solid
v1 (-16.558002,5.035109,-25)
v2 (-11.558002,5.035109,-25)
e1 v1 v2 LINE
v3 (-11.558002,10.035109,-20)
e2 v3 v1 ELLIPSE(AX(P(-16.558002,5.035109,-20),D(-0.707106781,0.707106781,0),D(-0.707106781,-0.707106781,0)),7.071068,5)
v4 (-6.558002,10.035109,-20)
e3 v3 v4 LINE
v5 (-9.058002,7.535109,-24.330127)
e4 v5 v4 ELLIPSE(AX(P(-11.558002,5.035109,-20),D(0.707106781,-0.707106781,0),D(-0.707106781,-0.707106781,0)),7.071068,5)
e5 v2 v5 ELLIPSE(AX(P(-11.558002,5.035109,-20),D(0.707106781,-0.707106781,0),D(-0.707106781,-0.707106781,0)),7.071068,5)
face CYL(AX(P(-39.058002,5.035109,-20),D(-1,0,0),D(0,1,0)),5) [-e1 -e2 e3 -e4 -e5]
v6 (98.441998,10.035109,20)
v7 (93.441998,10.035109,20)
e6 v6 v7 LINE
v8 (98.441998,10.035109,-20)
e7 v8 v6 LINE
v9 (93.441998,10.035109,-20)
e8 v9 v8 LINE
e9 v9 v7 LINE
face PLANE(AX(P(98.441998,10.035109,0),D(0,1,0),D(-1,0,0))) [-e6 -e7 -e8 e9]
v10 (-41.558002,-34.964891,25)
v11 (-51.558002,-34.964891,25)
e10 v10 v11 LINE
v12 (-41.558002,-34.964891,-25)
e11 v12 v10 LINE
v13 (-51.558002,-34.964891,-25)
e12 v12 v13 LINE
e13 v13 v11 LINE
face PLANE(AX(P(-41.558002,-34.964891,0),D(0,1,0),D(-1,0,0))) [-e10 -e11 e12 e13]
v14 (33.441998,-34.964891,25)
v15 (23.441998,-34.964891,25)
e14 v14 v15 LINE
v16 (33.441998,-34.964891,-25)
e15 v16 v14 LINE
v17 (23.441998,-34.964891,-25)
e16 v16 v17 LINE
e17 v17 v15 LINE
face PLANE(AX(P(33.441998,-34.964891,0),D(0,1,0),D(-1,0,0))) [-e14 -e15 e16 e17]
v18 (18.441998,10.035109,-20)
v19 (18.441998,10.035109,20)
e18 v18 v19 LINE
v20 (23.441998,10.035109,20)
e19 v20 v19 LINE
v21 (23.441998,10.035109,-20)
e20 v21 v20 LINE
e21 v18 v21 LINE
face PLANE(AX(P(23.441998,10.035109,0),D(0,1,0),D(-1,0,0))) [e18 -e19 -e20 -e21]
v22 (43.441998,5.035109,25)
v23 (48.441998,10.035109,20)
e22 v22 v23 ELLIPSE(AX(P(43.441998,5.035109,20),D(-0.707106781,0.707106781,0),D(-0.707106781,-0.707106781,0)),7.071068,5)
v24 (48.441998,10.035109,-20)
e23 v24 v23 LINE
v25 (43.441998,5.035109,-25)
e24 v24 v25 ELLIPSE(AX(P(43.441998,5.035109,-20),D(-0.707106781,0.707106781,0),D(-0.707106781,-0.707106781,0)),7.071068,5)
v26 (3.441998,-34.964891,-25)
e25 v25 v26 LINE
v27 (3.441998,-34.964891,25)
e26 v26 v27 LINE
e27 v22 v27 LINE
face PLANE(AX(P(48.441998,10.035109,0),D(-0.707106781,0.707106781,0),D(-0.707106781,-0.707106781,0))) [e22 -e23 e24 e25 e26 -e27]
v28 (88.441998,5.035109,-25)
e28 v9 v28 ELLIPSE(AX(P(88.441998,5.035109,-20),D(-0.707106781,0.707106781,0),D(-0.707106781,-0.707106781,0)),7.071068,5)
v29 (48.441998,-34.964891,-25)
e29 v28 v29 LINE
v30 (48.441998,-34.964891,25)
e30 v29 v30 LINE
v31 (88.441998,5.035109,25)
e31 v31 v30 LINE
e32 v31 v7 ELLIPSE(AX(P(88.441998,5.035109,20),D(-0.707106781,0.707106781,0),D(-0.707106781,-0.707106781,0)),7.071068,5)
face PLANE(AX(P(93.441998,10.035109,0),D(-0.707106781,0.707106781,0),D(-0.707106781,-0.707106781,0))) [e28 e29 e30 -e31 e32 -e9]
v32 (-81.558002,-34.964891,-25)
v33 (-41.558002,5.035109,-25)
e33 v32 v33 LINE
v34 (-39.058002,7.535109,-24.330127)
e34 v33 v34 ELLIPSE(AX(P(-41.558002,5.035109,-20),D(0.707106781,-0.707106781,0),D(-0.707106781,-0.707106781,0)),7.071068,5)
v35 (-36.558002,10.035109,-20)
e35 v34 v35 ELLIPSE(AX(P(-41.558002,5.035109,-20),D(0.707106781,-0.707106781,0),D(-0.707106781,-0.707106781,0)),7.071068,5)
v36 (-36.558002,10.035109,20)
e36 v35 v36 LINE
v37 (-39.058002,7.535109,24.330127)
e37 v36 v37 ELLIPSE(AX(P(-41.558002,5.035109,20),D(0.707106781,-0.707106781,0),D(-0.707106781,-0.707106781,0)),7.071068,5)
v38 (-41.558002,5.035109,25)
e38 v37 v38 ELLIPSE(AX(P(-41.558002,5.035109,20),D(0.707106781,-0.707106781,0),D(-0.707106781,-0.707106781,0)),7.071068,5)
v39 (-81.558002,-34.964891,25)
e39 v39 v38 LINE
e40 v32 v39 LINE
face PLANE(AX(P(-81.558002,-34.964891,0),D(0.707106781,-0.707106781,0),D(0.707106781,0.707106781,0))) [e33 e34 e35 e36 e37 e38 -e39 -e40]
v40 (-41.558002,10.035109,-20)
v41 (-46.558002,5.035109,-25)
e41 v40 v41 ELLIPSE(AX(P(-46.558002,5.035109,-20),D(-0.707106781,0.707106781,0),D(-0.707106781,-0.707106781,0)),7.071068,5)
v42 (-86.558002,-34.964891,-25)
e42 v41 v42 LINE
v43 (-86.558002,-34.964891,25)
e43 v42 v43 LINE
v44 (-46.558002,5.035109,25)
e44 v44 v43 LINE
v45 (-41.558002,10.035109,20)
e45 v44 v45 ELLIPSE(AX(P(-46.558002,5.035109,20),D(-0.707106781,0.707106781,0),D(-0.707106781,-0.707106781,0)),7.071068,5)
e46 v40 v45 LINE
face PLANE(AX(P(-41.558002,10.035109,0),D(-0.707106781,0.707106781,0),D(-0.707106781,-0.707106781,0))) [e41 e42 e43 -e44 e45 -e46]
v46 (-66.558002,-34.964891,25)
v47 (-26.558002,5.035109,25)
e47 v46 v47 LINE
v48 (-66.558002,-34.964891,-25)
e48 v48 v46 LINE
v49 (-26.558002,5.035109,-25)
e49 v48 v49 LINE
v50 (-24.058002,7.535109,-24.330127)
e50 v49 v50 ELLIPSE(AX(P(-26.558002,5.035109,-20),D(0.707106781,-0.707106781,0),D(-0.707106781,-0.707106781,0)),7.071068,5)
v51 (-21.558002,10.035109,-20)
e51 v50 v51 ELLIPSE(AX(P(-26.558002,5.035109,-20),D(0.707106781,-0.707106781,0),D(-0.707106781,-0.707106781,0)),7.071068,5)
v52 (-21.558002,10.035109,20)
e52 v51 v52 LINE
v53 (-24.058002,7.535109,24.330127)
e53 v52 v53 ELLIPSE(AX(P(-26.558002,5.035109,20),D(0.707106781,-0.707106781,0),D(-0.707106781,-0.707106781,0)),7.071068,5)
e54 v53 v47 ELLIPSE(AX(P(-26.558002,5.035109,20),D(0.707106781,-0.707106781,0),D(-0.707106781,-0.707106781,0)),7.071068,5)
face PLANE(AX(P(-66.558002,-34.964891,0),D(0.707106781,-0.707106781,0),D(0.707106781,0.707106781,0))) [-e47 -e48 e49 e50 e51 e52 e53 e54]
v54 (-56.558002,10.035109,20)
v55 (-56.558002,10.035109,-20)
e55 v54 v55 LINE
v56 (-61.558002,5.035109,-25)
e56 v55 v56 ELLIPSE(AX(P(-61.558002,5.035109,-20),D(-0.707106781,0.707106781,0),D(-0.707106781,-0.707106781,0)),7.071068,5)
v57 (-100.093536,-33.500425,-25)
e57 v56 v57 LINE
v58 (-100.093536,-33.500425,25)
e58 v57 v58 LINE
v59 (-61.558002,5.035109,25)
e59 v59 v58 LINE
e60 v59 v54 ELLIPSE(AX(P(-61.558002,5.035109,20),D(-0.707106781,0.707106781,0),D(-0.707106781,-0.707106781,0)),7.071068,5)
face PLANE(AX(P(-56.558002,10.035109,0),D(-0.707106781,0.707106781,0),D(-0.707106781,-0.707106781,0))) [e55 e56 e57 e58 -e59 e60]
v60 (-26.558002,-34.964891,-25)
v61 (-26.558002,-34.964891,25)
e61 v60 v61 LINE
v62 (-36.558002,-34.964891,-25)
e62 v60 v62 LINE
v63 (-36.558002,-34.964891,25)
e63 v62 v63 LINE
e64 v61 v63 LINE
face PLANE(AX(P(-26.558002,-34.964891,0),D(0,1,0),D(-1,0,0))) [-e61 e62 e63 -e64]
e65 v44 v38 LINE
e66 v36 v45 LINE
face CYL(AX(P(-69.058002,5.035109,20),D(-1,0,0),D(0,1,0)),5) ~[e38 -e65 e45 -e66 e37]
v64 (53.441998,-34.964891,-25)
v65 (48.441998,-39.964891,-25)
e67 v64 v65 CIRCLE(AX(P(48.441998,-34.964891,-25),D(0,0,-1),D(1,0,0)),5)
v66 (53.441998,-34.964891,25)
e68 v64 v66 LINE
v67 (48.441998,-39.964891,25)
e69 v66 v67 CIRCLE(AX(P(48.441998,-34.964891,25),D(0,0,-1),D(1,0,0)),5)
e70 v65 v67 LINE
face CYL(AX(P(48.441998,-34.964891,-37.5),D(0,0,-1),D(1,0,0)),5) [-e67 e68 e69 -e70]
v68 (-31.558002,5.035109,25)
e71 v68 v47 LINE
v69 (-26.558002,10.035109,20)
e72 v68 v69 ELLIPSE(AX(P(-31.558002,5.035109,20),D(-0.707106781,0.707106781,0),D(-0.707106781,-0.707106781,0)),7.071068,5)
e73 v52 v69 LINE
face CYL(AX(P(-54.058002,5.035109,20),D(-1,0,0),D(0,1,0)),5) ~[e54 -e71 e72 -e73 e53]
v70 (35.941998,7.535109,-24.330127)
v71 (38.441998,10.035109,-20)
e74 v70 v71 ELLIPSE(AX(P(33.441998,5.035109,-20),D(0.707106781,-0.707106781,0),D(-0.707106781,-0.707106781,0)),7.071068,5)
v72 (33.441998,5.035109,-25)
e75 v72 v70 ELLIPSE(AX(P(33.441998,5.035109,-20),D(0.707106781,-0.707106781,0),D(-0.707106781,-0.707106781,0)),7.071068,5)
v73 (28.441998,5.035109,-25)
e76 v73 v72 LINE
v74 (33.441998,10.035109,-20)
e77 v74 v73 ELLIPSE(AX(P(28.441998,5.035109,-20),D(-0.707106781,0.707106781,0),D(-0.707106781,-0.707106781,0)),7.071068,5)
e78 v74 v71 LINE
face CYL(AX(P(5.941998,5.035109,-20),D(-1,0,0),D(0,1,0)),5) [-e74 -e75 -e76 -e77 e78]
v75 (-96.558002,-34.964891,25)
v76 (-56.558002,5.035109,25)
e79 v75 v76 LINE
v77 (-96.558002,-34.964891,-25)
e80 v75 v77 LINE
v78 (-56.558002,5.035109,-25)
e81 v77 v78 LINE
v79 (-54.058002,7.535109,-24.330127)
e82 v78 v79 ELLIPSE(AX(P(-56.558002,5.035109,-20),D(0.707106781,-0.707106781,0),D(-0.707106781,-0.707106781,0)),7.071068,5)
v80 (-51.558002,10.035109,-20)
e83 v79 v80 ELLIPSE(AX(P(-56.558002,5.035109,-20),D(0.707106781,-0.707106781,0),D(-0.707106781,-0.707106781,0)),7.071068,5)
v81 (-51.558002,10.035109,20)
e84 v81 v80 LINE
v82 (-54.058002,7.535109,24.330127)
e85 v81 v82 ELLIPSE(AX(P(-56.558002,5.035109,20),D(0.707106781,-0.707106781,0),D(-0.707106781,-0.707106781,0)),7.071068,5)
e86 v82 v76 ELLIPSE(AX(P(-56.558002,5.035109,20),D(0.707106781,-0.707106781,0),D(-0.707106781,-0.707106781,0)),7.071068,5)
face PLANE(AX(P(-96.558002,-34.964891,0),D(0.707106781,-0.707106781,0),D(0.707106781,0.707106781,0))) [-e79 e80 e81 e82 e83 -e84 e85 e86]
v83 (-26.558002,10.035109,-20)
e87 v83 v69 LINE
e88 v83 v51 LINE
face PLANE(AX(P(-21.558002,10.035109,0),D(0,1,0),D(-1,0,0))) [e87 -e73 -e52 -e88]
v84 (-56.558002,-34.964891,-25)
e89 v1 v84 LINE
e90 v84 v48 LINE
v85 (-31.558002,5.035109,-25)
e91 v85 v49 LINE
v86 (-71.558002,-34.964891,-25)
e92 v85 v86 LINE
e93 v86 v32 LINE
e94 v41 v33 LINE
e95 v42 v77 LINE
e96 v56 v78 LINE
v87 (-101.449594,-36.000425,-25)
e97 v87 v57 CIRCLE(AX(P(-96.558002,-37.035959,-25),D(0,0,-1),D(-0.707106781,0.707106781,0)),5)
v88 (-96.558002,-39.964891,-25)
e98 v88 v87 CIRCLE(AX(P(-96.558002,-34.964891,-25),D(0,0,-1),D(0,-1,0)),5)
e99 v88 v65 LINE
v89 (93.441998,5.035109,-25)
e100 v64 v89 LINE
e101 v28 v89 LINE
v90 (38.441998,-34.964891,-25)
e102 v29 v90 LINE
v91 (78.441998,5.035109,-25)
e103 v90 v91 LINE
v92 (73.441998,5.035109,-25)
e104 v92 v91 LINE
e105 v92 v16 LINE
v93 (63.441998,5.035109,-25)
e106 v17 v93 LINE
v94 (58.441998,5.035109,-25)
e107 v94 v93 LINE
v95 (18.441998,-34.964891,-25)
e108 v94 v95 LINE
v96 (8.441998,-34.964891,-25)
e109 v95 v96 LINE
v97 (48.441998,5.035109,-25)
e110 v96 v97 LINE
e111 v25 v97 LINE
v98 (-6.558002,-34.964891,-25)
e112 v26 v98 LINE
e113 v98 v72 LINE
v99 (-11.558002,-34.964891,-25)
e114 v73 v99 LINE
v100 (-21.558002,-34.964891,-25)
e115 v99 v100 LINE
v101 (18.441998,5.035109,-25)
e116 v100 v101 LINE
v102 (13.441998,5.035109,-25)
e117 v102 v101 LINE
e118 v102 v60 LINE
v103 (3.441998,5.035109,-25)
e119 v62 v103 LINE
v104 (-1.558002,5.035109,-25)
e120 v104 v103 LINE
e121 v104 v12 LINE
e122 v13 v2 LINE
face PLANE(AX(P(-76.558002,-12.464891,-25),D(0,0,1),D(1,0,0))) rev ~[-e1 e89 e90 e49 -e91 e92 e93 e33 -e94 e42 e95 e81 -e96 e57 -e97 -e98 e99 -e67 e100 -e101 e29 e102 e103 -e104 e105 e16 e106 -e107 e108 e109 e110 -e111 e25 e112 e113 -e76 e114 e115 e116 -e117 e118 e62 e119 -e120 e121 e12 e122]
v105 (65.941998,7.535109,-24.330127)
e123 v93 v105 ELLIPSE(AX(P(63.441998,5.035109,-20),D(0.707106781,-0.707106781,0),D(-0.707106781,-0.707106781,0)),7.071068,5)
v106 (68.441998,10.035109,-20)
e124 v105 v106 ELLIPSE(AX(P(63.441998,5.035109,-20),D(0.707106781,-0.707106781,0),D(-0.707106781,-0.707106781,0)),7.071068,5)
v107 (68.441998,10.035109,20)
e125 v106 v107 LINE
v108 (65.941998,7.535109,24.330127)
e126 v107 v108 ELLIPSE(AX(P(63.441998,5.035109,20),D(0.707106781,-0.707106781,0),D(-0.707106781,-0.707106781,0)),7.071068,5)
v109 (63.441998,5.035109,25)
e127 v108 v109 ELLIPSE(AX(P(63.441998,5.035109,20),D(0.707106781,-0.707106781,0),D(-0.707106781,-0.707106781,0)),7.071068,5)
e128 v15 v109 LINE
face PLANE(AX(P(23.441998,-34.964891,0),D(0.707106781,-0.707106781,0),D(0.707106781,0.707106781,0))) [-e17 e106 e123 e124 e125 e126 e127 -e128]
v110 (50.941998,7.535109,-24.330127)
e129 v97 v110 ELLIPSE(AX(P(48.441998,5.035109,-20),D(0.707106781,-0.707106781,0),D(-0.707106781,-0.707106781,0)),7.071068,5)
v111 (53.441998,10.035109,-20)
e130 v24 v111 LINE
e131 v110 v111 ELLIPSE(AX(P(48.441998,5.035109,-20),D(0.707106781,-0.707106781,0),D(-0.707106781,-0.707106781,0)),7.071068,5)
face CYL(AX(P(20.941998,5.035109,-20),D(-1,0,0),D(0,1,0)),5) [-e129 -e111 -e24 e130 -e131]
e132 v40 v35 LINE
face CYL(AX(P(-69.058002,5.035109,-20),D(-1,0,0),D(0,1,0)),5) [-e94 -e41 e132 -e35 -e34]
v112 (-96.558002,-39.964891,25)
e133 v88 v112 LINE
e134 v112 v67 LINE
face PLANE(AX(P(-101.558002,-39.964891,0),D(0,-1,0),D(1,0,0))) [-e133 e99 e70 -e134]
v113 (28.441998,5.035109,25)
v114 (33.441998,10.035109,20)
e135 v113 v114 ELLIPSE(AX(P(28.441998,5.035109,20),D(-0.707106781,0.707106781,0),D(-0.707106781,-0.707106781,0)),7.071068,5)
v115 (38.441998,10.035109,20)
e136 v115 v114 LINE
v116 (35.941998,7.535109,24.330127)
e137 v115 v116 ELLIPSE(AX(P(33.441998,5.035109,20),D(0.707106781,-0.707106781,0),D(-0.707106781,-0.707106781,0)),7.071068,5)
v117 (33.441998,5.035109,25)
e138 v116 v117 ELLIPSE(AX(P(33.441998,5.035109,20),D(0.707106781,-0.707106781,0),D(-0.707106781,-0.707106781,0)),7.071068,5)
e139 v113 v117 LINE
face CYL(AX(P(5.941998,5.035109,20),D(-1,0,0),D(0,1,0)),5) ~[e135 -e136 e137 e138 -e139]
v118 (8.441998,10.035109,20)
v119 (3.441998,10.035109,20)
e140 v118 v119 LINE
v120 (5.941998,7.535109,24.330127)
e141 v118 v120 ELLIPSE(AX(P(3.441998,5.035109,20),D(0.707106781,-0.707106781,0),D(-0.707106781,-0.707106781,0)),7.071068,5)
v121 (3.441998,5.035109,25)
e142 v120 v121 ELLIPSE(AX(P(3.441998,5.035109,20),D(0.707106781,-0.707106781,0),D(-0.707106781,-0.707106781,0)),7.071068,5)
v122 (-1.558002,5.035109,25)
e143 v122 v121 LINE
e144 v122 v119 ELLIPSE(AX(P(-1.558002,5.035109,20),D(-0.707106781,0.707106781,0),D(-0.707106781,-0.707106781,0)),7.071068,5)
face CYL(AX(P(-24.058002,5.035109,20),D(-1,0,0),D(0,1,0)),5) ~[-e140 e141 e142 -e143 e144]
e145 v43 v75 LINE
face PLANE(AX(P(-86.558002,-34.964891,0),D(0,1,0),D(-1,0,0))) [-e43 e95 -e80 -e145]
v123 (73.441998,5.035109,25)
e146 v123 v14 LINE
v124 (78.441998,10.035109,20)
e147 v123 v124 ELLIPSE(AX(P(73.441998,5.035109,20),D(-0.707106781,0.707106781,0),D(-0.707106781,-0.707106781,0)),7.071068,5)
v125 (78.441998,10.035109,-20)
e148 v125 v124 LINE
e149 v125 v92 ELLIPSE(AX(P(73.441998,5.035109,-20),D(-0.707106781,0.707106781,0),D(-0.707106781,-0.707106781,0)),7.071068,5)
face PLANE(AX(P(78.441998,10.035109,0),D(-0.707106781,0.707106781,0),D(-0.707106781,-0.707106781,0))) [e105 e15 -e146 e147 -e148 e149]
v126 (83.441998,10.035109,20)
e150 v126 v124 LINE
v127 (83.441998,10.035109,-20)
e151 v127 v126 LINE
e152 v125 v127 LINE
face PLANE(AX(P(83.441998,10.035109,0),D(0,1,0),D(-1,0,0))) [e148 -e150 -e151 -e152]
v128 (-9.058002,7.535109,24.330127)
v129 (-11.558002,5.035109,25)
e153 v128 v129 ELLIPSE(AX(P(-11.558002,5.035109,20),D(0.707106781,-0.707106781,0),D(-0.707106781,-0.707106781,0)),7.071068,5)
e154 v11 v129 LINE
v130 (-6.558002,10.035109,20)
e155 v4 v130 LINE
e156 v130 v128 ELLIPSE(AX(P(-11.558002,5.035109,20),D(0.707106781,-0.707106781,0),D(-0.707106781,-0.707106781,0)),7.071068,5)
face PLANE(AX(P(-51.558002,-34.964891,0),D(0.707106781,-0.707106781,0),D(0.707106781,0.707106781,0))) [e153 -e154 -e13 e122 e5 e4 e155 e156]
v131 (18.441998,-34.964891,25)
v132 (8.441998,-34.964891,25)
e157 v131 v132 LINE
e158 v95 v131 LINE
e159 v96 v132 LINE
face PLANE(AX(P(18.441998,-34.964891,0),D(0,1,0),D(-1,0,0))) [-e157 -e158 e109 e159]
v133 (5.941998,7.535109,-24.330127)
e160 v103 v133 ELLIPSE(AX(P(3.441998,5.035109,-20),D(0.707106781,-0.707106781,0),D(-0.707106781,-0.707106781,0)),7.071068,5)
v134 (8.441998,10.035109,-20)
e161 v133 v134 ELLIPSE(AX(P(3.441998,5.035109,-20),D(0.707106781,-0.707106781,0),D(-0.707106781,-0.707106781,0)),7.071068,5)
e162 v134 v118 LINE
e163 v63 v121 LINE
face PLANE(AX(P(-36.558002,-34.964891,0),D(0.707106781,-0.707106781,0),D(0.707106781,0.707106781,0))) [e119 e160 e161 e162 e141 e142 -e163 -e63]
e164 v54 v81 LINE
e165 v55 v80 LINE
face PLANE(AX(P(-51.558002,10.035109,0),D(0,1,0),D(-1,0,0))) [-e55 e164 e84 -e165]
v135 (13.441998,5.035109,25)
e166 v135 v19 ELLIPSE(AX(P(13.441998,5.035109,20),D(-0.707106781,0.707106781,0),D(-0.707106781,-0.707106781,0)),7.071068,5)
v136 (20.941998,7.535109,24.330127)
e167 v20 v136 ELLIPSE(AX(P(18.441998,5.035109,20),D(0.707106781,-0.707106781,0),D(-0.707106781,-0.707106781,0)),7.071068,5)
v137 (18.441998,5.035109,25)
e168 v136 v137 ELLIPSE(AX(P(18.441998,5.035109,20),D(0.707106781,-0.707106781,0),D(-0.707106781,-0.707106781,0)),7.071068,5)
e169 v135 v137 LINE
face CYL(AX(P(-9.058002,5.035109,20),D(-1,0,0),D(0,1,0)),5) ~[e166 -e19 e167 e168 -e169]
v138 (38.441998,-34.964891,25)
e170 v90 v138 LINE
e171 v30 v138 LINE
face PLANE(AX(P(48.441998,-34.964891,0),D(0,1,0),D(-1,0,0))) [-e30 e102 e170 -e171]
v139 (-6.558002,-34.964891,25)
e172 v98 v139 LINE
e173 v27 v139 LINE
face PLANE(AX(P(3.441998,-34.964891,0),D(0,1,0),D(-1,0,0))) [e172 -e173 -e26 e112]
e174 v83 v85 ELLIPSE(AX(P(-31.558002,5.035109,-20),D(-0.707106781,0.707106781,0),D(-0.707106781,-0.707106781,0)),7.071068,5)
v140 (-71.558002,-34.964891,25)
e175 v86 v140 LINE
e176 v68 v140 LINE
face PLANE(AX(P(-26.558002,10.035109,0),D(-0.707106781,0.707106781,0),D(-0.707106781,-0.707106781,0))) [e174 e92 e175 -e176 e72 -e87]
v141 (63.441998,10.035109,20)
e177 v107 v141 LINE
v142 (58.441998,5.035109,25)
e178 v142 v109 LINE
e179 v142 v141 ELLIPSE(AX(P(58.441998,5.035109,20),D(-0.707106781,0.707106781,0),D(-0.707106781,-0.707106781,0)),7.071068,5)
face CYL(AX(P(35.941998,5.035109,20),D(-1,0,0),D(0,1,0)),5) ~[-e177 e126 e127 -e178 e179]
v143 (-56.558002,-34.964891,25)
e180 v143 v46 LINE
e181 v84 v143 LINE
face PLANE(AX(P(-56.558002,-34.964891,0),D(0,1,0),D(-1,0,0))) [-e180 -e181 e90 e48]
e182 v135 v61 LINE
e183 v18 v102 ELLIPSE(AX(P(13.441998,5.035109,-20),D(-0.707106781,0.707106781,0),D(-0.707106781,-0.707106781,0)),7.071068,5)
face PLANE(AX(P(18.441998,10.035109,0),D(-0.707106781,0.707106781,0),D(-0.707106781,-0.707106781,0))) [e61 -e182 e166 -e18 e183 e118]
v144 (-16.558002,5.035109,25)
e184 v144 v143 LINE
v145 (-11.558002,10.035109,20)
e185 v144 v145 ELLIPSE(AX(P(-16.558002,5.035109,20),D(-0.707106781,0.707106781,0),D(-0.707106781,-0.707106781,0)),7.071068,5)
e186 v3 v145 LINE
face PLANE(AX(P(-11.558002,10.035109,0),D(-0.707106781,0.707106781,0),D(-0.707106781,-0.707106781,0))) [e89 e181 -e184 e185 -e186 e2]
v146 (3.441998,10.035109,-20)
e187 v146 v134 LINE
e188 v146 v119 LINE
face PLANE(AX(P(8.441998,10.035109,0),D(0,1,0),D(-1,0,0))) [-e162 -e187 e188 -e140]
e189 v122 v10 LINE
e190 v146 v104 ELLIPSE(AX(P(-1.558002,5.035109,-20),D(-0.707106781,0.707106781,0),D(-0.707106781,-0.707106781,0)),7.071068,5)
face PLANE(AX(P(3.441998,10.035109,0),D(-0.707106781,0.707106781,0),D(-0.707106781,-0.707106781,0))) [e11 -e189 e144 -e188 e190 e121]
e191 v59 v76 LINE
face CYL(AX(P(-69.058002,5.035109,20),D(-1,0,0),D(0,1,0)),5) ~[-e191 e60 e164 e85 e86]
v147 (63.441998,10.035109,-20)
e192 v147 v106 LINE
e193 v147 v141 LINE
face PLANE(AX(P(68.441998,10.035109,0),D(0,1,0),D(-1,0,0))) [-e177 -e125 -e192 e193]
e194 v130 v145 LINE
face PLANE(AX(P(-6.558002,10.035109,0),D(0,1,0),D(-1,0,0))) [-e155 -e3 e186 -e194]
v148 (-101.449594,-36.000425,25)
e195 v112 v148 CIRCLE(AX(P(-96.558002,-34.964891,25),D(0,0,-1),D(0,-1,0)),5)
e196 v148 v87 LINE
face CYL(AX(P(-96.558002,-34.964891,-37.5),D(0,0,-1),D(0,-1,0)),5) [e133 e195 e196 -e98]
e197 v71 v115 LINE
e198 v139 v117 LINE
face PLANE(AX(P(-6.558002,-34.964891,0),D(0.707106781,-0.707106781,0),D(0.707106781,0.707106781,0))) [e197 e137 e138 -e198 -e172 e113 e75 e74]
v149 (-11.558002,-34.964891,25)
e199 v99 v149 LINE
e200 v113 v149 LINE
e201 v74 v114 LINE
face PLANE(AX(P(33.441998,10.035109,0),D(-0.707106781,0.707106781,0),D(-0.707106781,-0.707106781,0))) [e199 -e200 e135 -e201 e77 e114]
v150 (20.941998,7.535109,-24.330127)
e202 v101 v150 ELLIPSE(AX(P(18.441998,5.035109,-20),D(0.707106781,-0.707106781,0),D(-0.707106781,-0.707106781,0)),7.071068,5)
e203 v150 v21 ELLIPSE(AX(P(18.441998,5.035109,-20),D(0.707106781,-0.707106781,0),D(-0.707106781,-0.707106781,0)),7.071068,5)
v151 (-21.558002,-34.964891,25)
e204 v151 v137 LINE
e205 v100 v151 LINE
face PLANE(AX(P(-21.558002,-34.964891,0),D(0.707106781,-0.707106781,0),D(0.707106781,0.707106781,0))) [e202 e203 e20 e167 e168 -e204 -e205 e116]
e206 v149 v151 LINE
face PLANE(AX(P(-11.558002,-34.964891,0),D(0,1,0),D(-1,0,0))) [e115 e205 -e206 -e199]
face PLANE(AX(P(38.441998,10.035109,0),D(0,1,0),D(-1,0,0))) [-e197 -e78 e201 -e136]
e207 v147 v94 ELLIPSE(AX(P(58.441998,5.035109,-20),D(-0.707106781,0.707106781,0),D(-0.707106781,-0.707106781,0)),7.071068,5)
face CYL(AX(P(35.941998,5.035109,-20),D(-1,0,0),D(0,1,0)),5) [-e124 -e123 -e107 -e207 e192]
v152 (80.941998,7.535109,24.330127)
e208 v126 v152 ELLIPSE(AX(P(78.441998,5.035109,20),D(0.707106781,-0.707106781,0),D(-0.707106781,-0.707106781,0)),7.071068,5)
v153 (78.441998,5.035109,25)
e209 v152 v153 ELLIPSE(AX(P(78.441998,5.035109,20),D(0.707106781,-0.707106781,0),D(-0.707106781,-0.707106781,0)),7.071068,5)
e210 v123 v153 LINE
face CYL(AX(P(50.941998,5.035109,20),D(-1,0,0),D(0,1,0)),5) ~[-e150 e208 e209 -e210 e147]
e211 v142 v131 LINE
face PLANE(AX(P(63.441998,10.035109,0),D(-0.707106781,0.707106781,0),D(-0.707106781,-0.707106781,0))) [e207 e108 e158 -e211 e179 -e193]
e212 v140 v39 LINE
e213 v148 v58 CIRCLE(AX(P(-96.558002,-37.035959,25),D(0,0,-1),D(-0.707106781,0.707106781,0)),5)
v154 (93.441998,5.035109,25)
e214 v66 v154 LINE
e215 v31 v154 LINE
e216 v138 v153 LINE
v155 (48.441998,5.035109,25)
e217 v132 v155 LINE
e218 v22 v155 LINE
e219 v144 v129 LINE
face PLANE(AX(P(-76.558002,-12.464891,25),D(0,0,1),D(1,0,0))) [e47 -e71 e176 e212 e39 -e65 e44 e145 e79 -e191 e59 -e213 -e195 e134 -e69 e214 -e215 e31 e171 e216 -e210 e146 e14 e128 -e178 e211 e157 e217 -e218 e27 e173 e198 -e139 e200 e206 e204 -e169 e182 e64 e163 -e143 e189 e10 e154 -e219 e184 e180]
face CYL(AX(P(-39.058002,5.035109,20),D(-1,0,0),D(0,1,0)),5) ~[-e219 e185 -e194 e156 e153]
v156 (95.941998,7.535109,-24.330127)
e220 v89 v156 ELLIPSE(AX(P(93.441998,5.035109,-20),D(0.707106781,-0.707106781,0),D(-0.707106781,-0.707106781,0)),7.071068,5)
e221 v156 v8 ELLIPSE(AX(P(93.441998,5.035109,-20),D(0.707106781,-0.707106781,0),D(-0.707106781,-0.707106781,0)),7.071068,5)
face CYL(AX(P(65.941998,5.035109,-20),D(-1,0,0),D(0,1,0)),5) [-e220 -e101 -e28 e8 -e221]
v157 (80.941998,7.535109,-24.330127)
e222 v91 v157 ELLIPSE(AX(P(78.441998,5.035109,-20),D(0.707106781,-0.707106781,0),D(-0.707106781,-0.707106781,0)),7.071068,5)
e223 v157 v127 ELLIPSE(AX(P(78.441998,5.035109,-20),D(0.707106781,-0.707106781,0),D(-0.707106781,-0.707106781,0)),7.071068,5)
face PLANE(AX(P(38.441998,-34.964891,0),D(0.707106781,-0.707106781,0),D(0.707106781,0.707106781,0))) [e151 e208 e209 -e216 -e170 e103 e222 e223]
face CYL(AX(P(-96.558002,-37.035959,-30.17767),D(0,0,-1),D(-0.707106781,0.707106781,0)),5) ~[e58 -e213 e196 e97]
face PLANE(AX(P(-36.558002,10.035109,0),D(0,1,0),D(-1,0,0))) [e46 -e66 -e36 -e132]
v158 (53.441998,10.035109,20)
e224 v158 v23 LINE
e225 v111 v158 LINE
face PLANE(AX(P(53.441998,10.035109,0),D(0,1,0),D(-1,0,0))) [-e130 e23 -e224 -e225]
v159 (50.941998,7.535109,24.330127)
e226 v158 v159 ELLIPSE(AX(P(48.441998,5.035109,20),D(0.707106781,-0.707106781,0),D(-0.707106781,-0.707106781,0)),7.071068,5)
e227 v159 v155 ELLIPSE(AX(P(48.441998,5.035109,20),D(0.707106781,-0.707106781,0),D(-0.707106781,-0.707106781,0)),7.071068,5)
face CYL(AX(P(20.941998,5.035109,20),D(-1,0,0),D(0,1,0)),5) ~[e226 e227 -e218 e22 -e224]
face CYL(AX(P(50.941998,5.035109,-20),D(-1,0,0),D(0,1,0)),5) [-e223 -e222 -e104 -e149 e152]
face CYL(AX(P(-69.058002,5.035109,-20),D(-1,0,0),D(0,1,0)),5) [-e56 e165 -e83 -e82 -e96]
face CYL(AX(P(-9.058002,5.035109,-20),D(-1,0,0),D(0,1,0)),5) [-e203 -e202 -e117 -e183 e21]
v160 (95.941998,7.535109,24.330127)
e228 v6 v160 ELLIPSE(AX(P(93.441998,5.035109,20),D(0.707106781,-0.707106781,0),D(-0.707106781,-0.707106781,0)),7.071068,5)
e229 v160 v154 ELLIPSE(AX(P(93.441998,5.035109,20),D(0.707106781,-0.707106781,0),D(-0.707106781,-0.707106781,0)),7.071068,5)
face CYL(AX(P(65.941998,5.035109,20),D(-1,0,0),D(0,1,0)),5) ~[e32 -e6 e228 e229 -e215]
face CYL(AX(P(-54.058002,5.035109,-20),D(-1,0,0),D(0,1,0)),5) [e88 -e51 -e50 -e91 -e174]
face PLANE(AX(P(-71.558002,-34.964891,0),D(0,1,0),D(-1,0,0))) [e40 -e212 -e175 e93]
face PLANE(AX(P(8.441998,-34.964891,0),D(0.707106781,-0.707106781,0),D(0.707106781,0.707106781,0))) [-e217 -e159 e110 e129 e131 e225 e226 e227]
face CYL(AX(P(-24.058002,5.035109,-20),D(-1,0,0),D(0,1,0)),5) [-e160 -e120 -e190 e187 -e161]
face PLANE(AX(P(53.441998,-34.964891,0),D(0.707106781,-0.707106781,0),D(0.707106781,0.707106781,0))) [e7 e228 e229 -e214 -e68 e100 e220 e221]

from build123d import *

# Parameters (mm, degrees)
F1_DEPTH     = 25
F2_T1_DEPTH  = 30
F2_T3_DEPTH  = 30
F2_T5_DEPTH  = 30
F2_T7_DEPTH  = 30
F2_T9_DEPTH  = 30
F2_T11_DEPTH = 30
F2_T13_DEPTH = 30
F2_T15_DEPTH = 30
F2_T17_DEPTH = 30
F2_T19_DEPTH = 30
F2_T21_DEPTH = 30
F2_T23_DEPTH = 60.3553390593
F2_T25_DEPTH = 75


# Not quite as in the source:
# - a fillet or chamfer that OpenCascade refuses, or shapes differently, is made with other operations: its cross-section is extruded or revolved along the edge and cut away or added


with BuildPart() as f1:
    # F0 (on Top) → F1 (new body, symmetric)
    with BuildSketch(Plane.XY):
        Polygon((-56.5580020845, 10.0351088219), (-69.7381969311, -3.1450860247), (-101.5580020845, -34.9648911781), (-96.5580020845, -34.9648911781), (-51.5580020845, 10.0351088219), align=None)
        Polygon((-96.5580020845, -34.9648911781), (-101.5580020845, -34.9648911781), (-101.5580020845, -39.9648911781), (53.4419979155, -39.9648911781), (53.4419979155, -34.9648911781), (48.4419979155, -34.9648911781), (38.4419979155, -34.9648911781), (33.4419979155, -34.9648911781), (23.4419979155, -34.9648911781), (18.4419979155, -34.9648911781), (8.4419979155, -34.9648911781), (3.4419979155, -34.9648911781), (-6.5580020845, -34.9648911781), (-11.5580020845, -34.9648911781), (-21.5580020845, -34.9648911781), (-26.5580020845, -34.9648911781), (-36.5580020845, -34.9648911781), (-41.5580020845, -34.9648911781), (-51.5580020845, -34.9648911781), (-56.5580020845, -34.9648911781), (-66.5580020845, -34.9648911781), (-71.5580020845, -34.9648911781), (-81.5580020845, -34.9648911781), (-86.5580020845, -34.9648911781), align=None)
        Polygon((-41.5580020845, 10.0351088219), (-86.5580020845, -34.9648911781), (-81.5580020845, -34.9648911781), (-36.5580020845, 10.0351088219), align=None)
        Polygon((48.4419979155, -34.9648911781), (53.4419979155, -34.9648911781), (98.4419979155, 10.0351088219), (93.4419979155, 10.0351088219), align=None)
        Polygon((-26.5580020845, 10.0351088219), (-71.5580020845, -34.9648911781), (-66.5580020845, -34.9648911781), (-21.5580020845, 10.0351088219), align=None)
        Polygon((33.4419979155, -34.9648911781), (38.4419979155, -34.9648911781), (83.4419979155, 10.0351088219), (78.4419979155, 10.0351088219), align=None)
        Polygon((-11.5580020845, 10.0351088219), (-56.5580020845, -34.9648911781), (-51.5580020845, -34.9648911781), (-6.5580020845, 10.0351088219), align=None)
        Polygon((18.4419979155, -34.9648911781), (23.4419979155, -34.9648911781), (68.4419979155, 10.0351088219), (63.4419979155, 10.0351088219), align=None)
        Polygon((3.4419979155, 10.0351088219), (-41.5580020845, -34.9648911781), (-36.5580020845, -34.9648911781), (8.4419979155, 10.0351088219), align=None)
        Polygon((3.4419979155, -34.9648911781), (8.4419979155, -34.9648911781), (53.4419979155, 10.0351088219), (48.4419979155, 10.0351088219), align=None)
        Polygon((18.4419979155, 10.0351088219), (-26.5580020845, -34.9648911781), (-21.5580020845, -34.9648911781), (23.4419979155, 10.0351088219), align=None)
        Polygon((-11.5580020845, -34.9648911781), (-6.5580020845, -34.9648911781), (38.4419979155, 10.0351088219), (33.4419979155, 10.0351088219), align=None)
    extrude(amount=F1_DEPTH, both=True)

    # F2: fillet of radius 5 on 25 edges, made by hand

    # F2_s2 → F2_t1 (cut)
    with BuildSketch(Plane.YZ.offset(-69.0580020845)):
        with BuildLine():
            ThreePointArc((10.0351088219, -20), (8.5706427278, -23.5355339059), (5.0351088219, -25))
            Line((5.0351088219, -25), (10.0351088219, -25))
            Line((10.0351088219, -25), (10.0351088219, -20))
        make_face()
        with BuildLine():
            ThreePointArc((10.0351088219, 20), (8.5706427278, 23.5355339059), (5.0351088219, 25))
            Line((5.0351088219, 25), (10.0351088219, 25))
            Line((10.0351088219, 25), (10.0351088219, 20))
        make_face()
    extrude(amount=F2_T1_DEPTH, mode=Mode.SUBTRACT)

    # F2_s4 → F2_t3 (cut)
    with BuildSketch(Plane.YZ.offset(-54.0580020845)):
        with BuildLine():
            ThreePointArc((10.0351088219, 20), (8.5706427278, 23.5355339059), (5.0351088219, 25))
            Line((5.0351088219, 25), (10.0351088219, 25))
            Line((10.0351088219, 25), (10.0351088219, 20))
        make_face()
        with BuildLine():
            ThreePointArc((10.0351088219, -20), (8.5706427278, -23.5355339059), (5.0351088219, -25))
            Line((5.0351088219, -25), (10.0351088219, -25))
            Line((10.0351088219, -25), (10.0351088219, -20))
        make_face()
    extrude(amount=F2_T3_DEPTH, mode=Mode.SUBTRACT)

    # F2_s6 → F2_t5 (cut)
    with BuildSketch(Plane.YZ.offset(-39.0580020845)):
        with BuildLine():
            ThreePointArc((10.0351088219, -20), (8.5706427278, -23.5355339059), (5.0351088219, -25))
            Line((5.0351088219, -25), (10.0351088219, -25))
            Line((10.0351088219, -25), (10.0351088219, -20))
        make_face()
        with BuildLine():
            ThreePointArc((10.0351088219, 20), (8.5706427278, 23.5355339059), (5.0351088219, 25))
            Line((5.0351088219, 25), (10.0351088219, 25))
            Line((10.0351088219, 25), (10.0351088219, 20))
        make_face()
    extrude(amount=F2_T5_DEPTH, mode=Mode.SUBTRACT)

    # F2_s8 → F2_t7 (cut)
    with BuildSketch(Plane.YZ.offset(-24.0580020845)):
        with BuildLine():
            ThreePointArc((10.0351088219, 20), (8.5706427278, 23.5355339059), (5.0351088219, 25))
            Line((5.0351088219, 25), (10.0351088219, 25))
            Line((10.0351088219, 25), (10.0351088219, 20))
        make_face()
        with BuildLine():
            ThreePointArc((10.0351088219, -20), (8.5706427278, -23.5355339059), (5.0351088219, -25))
            Line((5.0351088219, -25), (10.0351088219, -25))
            Line((10.0351088219, -25), (10.0351088219, -20))
        make_face()
    extrude(amount=F2_T7_DEPTH, mode=Mode.SUBTRACT)

    # F2_s10 → F2_t9 (cut)
    with BuildSketch(Plane.YZ.offset(-9.0580020845)):
        with BuildLine():
            ThreePointArc((10.0351088219, 20), (8.5706427278, 23.5355339059), (5.0351088219, 25))
            Line((5.0351088219, 25), (10.0351088219, 25))
            Line((10.0351088219, 25), (10.0351088219, 20))
        make_face()
        with BuildLine():
            ThreePointArc((10.0351088219, -20), (8.5706427278, -23.5355339059), (5.0351088219, -25))
            Line((5.0351088219, -25), (10.0351088219, -25))
            Line((10.0351088219, -25), (10.0351088219, -20))
        make_face()
    extrude(amount=F2_T9_DEPTH, mode=Mode.SUBTRACT)

    # F2_s12 → F2_t11 (cut)
    with BuildSketch(Plane.YZ.offset(5.9419979155)):
        with BuildLine():
            ThreePointArc((10.0351088219, -20), (8.5706427278, -23.5355339059), (5.0351088219, -25))
            Line((5.0351088219, -25), (10.0351088219, -25))
            Line((10.0351088219, -25), (10.0351088219, -20))
        make_face()
        with BuildLine():
            ThreePointArc((10.0351088219, 20), (8.5706427278, 23.5355339059), (5.0351088219, 25))
            Line((5.0351088219, 25), (10.0351088219, 25))
            Line((10.0351088219, 25), (10.0351088219, 20))
        make_face()
    extrude(amount=F2_T11_DEPTH, mode=Mode.SUBTRACT)

    # F2_s14 → F2_t13 (cut)
    with BuildSketch(Plane.YZ.offset(20.9419979155)):
        with BuildLine():
            ThreePointArc((10.0351088219, 20), (8.5706427278, 23.5355339059), (5.0351088219, 25))
            Line((5.0351088219, 25), (10.0351088219, 25))
            Line((10.0351088219, 25), (10.0351088219, 20))
        make_face()
        with BuildLine():
            ThreePointArc((10.0351088219, -20), (8.5706427278, -23.5355339059), (5.0351088219, -25))
            Line((5.0351088219, -25), (10.0351088219, -25))
            Line((10.0351088219, -25), (10.0351088219, -20))
        make_face()
    extrude(amount=F2_T13_DEPTH, mode=Mode.SUBTRACT)

    # F2_s16 → F2_t15 (cut)
    with BuildSketch(Plane.YZ.offset(35.9419979155)):
        with BuildLine():
            ThreePointArc((10.0351088219, 20), (8.5706427278, 23.5355339059), (5.0351088219, 25))
            Line((5.0351088219, 25), (10.0351088219, 25))
            Line((10.0351088219, 25), (10.0351088219, 20))
        make_face()
        with BuildLine():
            ThreePointArc((10.0351088219, -20), (8.5706427278, -23.5355339059), (5.0351088219, -25))
            Line((5.0351088219, -25), (10.0351088219, -25))
            Line((10.0351088219, -25), (10.0351088219, -20))
        make_face()
    extrude(amount=F2_T15_DEPTH, mode=Mode.SUBTRACT)

    # F2_s18 → F2_t17 (cut)
    with BuildSketch(Plane.YZ.offset(50.9419979155)):
        with BuildLine():
            ThreePointArc((10.0351088219, 20), (8.5706427278, 23.5355339059), (5.0351088219, 25))
            Line((5.0351088219, 25), (10.0351088219, 25))
            Line((10.0351088219, 25), (10.0351088219, 20))
        make_face()
        with BuildLine():
            ThreePointArc((10.0351088219, -20), (8.5706427278, -23.5355339059), (5.0351088219, -25))
            Line((5.0351088219, -25), (10.0351088219, -25))
            Line((10.0351088219, -25), (10.0351088219, -20))
        make_face()
    extrude(amount=F2_T17_DEPTH, mode=Mode.SUBTRACT)

    # F2_s20 → F2_t19 (cut)
    with BuildSketch(Plane.YZ.offset(65.9419979155)):
        with BuildLine():
            ThreePointArc((10.0351088219, 20), (8.5706427278, 23.5355339059), (5.0351088219, 25))
            Line((5.0351088219, 25), (10.0351088219, 25))
            Line((10.0351088219, 25), (10.0351088219, 20))
        make_face()
        with BuildLine():
            ThreePointArc((10.0351088219, -20), (8.5706427278, -23.5355339059), (5.0351088219, -25))
            Line((5.0351088219, -25), (10.0351088219, -25))
            Line((10.0351088219, -25), (10.0351088219, -20))
        make_face()
    extrude(amount=F2_T19_DEPTH, mode=Mode.SUBTRACT)

    # F2_s22 → F2_t21 (cut)
    with BuildSketch(Plane.YZ.offset(80.9419979155)):
        with BuildLine():
            ThreePointArc((10.0351088219, 20), (8.5706427278, 23.5355339059), (5.0351088219, 25))
            Line((5.0351088219, 25), (10.0351088219, 25))
            Line((10.0351088219, 25), (10.0351088219, 20))
        make_face()
        with BuildLine():
            ThreePointArc((10.0351088219, -20), (8.5706427278, -23.5355339059), (5.0351088219, -25))
            Line((5.0351088219, -25), (10.0351088219, -25))
            Line((10.0351088219, -25), (10.0351088219, -20))
        make_face()
    extrude(amount=F2_T21_DEPTH, mode=Mode.SUBTRACT)

    # F2_s24 → F2_t23 (cut)
    with BuildSketch(Plane.XY.offset(-30.1776695297)):
        with BuildLine():
            ThreePointArc((-100.0935359904, -33.5004250841), (-101.1773997471, -35.1225418282), (-101.5580020845, -37.03595899))
            Line((-101.5580020845, -37.03595899), (-101.5580020845, -34.9648911781))
            Line((-101.5580020845, -34.9648911781), (-100.0935359904, -33.5004250841))
        make_face()
    extrude(amount=F2_T23_DEPTH, mode=Mode.SUBTRACT)

    # F2_s26 → F2_t25 (cut)
    with BuildSketch(Plane.XY.offset(-37.5)):
        with BuildLine():
            ThreePointArc((-96.5580020845, -39.9648911781), (-100.0935359904, -38.5004250841), (-101.5580020845, -34.9648911781))
            Line((-101.5580020845, -34.9648911781), (-101.5580020845, -39.9648911781))
            Line((-101.5580020845, -39.9648911781), (-96.5580020845, -39.9648911781))
        make_face()
        with BuildLine():
            ThreePointArc((53.4419979155, -34.9648911781), (51.9775318214, -38.5004250841), (48.4419979155, -39.9648911781))
            Line((48.4419979155, -39.9648911781), (53.4419979155, -39.9648911781))
            Line((53.4419979155, -39.9648911781), (53.4419979155, -34.9648911781))
        make_face()
    extrude(amount=F2_T25_DEPTH, mode=Mode.SUBTRACT)


solid = f1.part
